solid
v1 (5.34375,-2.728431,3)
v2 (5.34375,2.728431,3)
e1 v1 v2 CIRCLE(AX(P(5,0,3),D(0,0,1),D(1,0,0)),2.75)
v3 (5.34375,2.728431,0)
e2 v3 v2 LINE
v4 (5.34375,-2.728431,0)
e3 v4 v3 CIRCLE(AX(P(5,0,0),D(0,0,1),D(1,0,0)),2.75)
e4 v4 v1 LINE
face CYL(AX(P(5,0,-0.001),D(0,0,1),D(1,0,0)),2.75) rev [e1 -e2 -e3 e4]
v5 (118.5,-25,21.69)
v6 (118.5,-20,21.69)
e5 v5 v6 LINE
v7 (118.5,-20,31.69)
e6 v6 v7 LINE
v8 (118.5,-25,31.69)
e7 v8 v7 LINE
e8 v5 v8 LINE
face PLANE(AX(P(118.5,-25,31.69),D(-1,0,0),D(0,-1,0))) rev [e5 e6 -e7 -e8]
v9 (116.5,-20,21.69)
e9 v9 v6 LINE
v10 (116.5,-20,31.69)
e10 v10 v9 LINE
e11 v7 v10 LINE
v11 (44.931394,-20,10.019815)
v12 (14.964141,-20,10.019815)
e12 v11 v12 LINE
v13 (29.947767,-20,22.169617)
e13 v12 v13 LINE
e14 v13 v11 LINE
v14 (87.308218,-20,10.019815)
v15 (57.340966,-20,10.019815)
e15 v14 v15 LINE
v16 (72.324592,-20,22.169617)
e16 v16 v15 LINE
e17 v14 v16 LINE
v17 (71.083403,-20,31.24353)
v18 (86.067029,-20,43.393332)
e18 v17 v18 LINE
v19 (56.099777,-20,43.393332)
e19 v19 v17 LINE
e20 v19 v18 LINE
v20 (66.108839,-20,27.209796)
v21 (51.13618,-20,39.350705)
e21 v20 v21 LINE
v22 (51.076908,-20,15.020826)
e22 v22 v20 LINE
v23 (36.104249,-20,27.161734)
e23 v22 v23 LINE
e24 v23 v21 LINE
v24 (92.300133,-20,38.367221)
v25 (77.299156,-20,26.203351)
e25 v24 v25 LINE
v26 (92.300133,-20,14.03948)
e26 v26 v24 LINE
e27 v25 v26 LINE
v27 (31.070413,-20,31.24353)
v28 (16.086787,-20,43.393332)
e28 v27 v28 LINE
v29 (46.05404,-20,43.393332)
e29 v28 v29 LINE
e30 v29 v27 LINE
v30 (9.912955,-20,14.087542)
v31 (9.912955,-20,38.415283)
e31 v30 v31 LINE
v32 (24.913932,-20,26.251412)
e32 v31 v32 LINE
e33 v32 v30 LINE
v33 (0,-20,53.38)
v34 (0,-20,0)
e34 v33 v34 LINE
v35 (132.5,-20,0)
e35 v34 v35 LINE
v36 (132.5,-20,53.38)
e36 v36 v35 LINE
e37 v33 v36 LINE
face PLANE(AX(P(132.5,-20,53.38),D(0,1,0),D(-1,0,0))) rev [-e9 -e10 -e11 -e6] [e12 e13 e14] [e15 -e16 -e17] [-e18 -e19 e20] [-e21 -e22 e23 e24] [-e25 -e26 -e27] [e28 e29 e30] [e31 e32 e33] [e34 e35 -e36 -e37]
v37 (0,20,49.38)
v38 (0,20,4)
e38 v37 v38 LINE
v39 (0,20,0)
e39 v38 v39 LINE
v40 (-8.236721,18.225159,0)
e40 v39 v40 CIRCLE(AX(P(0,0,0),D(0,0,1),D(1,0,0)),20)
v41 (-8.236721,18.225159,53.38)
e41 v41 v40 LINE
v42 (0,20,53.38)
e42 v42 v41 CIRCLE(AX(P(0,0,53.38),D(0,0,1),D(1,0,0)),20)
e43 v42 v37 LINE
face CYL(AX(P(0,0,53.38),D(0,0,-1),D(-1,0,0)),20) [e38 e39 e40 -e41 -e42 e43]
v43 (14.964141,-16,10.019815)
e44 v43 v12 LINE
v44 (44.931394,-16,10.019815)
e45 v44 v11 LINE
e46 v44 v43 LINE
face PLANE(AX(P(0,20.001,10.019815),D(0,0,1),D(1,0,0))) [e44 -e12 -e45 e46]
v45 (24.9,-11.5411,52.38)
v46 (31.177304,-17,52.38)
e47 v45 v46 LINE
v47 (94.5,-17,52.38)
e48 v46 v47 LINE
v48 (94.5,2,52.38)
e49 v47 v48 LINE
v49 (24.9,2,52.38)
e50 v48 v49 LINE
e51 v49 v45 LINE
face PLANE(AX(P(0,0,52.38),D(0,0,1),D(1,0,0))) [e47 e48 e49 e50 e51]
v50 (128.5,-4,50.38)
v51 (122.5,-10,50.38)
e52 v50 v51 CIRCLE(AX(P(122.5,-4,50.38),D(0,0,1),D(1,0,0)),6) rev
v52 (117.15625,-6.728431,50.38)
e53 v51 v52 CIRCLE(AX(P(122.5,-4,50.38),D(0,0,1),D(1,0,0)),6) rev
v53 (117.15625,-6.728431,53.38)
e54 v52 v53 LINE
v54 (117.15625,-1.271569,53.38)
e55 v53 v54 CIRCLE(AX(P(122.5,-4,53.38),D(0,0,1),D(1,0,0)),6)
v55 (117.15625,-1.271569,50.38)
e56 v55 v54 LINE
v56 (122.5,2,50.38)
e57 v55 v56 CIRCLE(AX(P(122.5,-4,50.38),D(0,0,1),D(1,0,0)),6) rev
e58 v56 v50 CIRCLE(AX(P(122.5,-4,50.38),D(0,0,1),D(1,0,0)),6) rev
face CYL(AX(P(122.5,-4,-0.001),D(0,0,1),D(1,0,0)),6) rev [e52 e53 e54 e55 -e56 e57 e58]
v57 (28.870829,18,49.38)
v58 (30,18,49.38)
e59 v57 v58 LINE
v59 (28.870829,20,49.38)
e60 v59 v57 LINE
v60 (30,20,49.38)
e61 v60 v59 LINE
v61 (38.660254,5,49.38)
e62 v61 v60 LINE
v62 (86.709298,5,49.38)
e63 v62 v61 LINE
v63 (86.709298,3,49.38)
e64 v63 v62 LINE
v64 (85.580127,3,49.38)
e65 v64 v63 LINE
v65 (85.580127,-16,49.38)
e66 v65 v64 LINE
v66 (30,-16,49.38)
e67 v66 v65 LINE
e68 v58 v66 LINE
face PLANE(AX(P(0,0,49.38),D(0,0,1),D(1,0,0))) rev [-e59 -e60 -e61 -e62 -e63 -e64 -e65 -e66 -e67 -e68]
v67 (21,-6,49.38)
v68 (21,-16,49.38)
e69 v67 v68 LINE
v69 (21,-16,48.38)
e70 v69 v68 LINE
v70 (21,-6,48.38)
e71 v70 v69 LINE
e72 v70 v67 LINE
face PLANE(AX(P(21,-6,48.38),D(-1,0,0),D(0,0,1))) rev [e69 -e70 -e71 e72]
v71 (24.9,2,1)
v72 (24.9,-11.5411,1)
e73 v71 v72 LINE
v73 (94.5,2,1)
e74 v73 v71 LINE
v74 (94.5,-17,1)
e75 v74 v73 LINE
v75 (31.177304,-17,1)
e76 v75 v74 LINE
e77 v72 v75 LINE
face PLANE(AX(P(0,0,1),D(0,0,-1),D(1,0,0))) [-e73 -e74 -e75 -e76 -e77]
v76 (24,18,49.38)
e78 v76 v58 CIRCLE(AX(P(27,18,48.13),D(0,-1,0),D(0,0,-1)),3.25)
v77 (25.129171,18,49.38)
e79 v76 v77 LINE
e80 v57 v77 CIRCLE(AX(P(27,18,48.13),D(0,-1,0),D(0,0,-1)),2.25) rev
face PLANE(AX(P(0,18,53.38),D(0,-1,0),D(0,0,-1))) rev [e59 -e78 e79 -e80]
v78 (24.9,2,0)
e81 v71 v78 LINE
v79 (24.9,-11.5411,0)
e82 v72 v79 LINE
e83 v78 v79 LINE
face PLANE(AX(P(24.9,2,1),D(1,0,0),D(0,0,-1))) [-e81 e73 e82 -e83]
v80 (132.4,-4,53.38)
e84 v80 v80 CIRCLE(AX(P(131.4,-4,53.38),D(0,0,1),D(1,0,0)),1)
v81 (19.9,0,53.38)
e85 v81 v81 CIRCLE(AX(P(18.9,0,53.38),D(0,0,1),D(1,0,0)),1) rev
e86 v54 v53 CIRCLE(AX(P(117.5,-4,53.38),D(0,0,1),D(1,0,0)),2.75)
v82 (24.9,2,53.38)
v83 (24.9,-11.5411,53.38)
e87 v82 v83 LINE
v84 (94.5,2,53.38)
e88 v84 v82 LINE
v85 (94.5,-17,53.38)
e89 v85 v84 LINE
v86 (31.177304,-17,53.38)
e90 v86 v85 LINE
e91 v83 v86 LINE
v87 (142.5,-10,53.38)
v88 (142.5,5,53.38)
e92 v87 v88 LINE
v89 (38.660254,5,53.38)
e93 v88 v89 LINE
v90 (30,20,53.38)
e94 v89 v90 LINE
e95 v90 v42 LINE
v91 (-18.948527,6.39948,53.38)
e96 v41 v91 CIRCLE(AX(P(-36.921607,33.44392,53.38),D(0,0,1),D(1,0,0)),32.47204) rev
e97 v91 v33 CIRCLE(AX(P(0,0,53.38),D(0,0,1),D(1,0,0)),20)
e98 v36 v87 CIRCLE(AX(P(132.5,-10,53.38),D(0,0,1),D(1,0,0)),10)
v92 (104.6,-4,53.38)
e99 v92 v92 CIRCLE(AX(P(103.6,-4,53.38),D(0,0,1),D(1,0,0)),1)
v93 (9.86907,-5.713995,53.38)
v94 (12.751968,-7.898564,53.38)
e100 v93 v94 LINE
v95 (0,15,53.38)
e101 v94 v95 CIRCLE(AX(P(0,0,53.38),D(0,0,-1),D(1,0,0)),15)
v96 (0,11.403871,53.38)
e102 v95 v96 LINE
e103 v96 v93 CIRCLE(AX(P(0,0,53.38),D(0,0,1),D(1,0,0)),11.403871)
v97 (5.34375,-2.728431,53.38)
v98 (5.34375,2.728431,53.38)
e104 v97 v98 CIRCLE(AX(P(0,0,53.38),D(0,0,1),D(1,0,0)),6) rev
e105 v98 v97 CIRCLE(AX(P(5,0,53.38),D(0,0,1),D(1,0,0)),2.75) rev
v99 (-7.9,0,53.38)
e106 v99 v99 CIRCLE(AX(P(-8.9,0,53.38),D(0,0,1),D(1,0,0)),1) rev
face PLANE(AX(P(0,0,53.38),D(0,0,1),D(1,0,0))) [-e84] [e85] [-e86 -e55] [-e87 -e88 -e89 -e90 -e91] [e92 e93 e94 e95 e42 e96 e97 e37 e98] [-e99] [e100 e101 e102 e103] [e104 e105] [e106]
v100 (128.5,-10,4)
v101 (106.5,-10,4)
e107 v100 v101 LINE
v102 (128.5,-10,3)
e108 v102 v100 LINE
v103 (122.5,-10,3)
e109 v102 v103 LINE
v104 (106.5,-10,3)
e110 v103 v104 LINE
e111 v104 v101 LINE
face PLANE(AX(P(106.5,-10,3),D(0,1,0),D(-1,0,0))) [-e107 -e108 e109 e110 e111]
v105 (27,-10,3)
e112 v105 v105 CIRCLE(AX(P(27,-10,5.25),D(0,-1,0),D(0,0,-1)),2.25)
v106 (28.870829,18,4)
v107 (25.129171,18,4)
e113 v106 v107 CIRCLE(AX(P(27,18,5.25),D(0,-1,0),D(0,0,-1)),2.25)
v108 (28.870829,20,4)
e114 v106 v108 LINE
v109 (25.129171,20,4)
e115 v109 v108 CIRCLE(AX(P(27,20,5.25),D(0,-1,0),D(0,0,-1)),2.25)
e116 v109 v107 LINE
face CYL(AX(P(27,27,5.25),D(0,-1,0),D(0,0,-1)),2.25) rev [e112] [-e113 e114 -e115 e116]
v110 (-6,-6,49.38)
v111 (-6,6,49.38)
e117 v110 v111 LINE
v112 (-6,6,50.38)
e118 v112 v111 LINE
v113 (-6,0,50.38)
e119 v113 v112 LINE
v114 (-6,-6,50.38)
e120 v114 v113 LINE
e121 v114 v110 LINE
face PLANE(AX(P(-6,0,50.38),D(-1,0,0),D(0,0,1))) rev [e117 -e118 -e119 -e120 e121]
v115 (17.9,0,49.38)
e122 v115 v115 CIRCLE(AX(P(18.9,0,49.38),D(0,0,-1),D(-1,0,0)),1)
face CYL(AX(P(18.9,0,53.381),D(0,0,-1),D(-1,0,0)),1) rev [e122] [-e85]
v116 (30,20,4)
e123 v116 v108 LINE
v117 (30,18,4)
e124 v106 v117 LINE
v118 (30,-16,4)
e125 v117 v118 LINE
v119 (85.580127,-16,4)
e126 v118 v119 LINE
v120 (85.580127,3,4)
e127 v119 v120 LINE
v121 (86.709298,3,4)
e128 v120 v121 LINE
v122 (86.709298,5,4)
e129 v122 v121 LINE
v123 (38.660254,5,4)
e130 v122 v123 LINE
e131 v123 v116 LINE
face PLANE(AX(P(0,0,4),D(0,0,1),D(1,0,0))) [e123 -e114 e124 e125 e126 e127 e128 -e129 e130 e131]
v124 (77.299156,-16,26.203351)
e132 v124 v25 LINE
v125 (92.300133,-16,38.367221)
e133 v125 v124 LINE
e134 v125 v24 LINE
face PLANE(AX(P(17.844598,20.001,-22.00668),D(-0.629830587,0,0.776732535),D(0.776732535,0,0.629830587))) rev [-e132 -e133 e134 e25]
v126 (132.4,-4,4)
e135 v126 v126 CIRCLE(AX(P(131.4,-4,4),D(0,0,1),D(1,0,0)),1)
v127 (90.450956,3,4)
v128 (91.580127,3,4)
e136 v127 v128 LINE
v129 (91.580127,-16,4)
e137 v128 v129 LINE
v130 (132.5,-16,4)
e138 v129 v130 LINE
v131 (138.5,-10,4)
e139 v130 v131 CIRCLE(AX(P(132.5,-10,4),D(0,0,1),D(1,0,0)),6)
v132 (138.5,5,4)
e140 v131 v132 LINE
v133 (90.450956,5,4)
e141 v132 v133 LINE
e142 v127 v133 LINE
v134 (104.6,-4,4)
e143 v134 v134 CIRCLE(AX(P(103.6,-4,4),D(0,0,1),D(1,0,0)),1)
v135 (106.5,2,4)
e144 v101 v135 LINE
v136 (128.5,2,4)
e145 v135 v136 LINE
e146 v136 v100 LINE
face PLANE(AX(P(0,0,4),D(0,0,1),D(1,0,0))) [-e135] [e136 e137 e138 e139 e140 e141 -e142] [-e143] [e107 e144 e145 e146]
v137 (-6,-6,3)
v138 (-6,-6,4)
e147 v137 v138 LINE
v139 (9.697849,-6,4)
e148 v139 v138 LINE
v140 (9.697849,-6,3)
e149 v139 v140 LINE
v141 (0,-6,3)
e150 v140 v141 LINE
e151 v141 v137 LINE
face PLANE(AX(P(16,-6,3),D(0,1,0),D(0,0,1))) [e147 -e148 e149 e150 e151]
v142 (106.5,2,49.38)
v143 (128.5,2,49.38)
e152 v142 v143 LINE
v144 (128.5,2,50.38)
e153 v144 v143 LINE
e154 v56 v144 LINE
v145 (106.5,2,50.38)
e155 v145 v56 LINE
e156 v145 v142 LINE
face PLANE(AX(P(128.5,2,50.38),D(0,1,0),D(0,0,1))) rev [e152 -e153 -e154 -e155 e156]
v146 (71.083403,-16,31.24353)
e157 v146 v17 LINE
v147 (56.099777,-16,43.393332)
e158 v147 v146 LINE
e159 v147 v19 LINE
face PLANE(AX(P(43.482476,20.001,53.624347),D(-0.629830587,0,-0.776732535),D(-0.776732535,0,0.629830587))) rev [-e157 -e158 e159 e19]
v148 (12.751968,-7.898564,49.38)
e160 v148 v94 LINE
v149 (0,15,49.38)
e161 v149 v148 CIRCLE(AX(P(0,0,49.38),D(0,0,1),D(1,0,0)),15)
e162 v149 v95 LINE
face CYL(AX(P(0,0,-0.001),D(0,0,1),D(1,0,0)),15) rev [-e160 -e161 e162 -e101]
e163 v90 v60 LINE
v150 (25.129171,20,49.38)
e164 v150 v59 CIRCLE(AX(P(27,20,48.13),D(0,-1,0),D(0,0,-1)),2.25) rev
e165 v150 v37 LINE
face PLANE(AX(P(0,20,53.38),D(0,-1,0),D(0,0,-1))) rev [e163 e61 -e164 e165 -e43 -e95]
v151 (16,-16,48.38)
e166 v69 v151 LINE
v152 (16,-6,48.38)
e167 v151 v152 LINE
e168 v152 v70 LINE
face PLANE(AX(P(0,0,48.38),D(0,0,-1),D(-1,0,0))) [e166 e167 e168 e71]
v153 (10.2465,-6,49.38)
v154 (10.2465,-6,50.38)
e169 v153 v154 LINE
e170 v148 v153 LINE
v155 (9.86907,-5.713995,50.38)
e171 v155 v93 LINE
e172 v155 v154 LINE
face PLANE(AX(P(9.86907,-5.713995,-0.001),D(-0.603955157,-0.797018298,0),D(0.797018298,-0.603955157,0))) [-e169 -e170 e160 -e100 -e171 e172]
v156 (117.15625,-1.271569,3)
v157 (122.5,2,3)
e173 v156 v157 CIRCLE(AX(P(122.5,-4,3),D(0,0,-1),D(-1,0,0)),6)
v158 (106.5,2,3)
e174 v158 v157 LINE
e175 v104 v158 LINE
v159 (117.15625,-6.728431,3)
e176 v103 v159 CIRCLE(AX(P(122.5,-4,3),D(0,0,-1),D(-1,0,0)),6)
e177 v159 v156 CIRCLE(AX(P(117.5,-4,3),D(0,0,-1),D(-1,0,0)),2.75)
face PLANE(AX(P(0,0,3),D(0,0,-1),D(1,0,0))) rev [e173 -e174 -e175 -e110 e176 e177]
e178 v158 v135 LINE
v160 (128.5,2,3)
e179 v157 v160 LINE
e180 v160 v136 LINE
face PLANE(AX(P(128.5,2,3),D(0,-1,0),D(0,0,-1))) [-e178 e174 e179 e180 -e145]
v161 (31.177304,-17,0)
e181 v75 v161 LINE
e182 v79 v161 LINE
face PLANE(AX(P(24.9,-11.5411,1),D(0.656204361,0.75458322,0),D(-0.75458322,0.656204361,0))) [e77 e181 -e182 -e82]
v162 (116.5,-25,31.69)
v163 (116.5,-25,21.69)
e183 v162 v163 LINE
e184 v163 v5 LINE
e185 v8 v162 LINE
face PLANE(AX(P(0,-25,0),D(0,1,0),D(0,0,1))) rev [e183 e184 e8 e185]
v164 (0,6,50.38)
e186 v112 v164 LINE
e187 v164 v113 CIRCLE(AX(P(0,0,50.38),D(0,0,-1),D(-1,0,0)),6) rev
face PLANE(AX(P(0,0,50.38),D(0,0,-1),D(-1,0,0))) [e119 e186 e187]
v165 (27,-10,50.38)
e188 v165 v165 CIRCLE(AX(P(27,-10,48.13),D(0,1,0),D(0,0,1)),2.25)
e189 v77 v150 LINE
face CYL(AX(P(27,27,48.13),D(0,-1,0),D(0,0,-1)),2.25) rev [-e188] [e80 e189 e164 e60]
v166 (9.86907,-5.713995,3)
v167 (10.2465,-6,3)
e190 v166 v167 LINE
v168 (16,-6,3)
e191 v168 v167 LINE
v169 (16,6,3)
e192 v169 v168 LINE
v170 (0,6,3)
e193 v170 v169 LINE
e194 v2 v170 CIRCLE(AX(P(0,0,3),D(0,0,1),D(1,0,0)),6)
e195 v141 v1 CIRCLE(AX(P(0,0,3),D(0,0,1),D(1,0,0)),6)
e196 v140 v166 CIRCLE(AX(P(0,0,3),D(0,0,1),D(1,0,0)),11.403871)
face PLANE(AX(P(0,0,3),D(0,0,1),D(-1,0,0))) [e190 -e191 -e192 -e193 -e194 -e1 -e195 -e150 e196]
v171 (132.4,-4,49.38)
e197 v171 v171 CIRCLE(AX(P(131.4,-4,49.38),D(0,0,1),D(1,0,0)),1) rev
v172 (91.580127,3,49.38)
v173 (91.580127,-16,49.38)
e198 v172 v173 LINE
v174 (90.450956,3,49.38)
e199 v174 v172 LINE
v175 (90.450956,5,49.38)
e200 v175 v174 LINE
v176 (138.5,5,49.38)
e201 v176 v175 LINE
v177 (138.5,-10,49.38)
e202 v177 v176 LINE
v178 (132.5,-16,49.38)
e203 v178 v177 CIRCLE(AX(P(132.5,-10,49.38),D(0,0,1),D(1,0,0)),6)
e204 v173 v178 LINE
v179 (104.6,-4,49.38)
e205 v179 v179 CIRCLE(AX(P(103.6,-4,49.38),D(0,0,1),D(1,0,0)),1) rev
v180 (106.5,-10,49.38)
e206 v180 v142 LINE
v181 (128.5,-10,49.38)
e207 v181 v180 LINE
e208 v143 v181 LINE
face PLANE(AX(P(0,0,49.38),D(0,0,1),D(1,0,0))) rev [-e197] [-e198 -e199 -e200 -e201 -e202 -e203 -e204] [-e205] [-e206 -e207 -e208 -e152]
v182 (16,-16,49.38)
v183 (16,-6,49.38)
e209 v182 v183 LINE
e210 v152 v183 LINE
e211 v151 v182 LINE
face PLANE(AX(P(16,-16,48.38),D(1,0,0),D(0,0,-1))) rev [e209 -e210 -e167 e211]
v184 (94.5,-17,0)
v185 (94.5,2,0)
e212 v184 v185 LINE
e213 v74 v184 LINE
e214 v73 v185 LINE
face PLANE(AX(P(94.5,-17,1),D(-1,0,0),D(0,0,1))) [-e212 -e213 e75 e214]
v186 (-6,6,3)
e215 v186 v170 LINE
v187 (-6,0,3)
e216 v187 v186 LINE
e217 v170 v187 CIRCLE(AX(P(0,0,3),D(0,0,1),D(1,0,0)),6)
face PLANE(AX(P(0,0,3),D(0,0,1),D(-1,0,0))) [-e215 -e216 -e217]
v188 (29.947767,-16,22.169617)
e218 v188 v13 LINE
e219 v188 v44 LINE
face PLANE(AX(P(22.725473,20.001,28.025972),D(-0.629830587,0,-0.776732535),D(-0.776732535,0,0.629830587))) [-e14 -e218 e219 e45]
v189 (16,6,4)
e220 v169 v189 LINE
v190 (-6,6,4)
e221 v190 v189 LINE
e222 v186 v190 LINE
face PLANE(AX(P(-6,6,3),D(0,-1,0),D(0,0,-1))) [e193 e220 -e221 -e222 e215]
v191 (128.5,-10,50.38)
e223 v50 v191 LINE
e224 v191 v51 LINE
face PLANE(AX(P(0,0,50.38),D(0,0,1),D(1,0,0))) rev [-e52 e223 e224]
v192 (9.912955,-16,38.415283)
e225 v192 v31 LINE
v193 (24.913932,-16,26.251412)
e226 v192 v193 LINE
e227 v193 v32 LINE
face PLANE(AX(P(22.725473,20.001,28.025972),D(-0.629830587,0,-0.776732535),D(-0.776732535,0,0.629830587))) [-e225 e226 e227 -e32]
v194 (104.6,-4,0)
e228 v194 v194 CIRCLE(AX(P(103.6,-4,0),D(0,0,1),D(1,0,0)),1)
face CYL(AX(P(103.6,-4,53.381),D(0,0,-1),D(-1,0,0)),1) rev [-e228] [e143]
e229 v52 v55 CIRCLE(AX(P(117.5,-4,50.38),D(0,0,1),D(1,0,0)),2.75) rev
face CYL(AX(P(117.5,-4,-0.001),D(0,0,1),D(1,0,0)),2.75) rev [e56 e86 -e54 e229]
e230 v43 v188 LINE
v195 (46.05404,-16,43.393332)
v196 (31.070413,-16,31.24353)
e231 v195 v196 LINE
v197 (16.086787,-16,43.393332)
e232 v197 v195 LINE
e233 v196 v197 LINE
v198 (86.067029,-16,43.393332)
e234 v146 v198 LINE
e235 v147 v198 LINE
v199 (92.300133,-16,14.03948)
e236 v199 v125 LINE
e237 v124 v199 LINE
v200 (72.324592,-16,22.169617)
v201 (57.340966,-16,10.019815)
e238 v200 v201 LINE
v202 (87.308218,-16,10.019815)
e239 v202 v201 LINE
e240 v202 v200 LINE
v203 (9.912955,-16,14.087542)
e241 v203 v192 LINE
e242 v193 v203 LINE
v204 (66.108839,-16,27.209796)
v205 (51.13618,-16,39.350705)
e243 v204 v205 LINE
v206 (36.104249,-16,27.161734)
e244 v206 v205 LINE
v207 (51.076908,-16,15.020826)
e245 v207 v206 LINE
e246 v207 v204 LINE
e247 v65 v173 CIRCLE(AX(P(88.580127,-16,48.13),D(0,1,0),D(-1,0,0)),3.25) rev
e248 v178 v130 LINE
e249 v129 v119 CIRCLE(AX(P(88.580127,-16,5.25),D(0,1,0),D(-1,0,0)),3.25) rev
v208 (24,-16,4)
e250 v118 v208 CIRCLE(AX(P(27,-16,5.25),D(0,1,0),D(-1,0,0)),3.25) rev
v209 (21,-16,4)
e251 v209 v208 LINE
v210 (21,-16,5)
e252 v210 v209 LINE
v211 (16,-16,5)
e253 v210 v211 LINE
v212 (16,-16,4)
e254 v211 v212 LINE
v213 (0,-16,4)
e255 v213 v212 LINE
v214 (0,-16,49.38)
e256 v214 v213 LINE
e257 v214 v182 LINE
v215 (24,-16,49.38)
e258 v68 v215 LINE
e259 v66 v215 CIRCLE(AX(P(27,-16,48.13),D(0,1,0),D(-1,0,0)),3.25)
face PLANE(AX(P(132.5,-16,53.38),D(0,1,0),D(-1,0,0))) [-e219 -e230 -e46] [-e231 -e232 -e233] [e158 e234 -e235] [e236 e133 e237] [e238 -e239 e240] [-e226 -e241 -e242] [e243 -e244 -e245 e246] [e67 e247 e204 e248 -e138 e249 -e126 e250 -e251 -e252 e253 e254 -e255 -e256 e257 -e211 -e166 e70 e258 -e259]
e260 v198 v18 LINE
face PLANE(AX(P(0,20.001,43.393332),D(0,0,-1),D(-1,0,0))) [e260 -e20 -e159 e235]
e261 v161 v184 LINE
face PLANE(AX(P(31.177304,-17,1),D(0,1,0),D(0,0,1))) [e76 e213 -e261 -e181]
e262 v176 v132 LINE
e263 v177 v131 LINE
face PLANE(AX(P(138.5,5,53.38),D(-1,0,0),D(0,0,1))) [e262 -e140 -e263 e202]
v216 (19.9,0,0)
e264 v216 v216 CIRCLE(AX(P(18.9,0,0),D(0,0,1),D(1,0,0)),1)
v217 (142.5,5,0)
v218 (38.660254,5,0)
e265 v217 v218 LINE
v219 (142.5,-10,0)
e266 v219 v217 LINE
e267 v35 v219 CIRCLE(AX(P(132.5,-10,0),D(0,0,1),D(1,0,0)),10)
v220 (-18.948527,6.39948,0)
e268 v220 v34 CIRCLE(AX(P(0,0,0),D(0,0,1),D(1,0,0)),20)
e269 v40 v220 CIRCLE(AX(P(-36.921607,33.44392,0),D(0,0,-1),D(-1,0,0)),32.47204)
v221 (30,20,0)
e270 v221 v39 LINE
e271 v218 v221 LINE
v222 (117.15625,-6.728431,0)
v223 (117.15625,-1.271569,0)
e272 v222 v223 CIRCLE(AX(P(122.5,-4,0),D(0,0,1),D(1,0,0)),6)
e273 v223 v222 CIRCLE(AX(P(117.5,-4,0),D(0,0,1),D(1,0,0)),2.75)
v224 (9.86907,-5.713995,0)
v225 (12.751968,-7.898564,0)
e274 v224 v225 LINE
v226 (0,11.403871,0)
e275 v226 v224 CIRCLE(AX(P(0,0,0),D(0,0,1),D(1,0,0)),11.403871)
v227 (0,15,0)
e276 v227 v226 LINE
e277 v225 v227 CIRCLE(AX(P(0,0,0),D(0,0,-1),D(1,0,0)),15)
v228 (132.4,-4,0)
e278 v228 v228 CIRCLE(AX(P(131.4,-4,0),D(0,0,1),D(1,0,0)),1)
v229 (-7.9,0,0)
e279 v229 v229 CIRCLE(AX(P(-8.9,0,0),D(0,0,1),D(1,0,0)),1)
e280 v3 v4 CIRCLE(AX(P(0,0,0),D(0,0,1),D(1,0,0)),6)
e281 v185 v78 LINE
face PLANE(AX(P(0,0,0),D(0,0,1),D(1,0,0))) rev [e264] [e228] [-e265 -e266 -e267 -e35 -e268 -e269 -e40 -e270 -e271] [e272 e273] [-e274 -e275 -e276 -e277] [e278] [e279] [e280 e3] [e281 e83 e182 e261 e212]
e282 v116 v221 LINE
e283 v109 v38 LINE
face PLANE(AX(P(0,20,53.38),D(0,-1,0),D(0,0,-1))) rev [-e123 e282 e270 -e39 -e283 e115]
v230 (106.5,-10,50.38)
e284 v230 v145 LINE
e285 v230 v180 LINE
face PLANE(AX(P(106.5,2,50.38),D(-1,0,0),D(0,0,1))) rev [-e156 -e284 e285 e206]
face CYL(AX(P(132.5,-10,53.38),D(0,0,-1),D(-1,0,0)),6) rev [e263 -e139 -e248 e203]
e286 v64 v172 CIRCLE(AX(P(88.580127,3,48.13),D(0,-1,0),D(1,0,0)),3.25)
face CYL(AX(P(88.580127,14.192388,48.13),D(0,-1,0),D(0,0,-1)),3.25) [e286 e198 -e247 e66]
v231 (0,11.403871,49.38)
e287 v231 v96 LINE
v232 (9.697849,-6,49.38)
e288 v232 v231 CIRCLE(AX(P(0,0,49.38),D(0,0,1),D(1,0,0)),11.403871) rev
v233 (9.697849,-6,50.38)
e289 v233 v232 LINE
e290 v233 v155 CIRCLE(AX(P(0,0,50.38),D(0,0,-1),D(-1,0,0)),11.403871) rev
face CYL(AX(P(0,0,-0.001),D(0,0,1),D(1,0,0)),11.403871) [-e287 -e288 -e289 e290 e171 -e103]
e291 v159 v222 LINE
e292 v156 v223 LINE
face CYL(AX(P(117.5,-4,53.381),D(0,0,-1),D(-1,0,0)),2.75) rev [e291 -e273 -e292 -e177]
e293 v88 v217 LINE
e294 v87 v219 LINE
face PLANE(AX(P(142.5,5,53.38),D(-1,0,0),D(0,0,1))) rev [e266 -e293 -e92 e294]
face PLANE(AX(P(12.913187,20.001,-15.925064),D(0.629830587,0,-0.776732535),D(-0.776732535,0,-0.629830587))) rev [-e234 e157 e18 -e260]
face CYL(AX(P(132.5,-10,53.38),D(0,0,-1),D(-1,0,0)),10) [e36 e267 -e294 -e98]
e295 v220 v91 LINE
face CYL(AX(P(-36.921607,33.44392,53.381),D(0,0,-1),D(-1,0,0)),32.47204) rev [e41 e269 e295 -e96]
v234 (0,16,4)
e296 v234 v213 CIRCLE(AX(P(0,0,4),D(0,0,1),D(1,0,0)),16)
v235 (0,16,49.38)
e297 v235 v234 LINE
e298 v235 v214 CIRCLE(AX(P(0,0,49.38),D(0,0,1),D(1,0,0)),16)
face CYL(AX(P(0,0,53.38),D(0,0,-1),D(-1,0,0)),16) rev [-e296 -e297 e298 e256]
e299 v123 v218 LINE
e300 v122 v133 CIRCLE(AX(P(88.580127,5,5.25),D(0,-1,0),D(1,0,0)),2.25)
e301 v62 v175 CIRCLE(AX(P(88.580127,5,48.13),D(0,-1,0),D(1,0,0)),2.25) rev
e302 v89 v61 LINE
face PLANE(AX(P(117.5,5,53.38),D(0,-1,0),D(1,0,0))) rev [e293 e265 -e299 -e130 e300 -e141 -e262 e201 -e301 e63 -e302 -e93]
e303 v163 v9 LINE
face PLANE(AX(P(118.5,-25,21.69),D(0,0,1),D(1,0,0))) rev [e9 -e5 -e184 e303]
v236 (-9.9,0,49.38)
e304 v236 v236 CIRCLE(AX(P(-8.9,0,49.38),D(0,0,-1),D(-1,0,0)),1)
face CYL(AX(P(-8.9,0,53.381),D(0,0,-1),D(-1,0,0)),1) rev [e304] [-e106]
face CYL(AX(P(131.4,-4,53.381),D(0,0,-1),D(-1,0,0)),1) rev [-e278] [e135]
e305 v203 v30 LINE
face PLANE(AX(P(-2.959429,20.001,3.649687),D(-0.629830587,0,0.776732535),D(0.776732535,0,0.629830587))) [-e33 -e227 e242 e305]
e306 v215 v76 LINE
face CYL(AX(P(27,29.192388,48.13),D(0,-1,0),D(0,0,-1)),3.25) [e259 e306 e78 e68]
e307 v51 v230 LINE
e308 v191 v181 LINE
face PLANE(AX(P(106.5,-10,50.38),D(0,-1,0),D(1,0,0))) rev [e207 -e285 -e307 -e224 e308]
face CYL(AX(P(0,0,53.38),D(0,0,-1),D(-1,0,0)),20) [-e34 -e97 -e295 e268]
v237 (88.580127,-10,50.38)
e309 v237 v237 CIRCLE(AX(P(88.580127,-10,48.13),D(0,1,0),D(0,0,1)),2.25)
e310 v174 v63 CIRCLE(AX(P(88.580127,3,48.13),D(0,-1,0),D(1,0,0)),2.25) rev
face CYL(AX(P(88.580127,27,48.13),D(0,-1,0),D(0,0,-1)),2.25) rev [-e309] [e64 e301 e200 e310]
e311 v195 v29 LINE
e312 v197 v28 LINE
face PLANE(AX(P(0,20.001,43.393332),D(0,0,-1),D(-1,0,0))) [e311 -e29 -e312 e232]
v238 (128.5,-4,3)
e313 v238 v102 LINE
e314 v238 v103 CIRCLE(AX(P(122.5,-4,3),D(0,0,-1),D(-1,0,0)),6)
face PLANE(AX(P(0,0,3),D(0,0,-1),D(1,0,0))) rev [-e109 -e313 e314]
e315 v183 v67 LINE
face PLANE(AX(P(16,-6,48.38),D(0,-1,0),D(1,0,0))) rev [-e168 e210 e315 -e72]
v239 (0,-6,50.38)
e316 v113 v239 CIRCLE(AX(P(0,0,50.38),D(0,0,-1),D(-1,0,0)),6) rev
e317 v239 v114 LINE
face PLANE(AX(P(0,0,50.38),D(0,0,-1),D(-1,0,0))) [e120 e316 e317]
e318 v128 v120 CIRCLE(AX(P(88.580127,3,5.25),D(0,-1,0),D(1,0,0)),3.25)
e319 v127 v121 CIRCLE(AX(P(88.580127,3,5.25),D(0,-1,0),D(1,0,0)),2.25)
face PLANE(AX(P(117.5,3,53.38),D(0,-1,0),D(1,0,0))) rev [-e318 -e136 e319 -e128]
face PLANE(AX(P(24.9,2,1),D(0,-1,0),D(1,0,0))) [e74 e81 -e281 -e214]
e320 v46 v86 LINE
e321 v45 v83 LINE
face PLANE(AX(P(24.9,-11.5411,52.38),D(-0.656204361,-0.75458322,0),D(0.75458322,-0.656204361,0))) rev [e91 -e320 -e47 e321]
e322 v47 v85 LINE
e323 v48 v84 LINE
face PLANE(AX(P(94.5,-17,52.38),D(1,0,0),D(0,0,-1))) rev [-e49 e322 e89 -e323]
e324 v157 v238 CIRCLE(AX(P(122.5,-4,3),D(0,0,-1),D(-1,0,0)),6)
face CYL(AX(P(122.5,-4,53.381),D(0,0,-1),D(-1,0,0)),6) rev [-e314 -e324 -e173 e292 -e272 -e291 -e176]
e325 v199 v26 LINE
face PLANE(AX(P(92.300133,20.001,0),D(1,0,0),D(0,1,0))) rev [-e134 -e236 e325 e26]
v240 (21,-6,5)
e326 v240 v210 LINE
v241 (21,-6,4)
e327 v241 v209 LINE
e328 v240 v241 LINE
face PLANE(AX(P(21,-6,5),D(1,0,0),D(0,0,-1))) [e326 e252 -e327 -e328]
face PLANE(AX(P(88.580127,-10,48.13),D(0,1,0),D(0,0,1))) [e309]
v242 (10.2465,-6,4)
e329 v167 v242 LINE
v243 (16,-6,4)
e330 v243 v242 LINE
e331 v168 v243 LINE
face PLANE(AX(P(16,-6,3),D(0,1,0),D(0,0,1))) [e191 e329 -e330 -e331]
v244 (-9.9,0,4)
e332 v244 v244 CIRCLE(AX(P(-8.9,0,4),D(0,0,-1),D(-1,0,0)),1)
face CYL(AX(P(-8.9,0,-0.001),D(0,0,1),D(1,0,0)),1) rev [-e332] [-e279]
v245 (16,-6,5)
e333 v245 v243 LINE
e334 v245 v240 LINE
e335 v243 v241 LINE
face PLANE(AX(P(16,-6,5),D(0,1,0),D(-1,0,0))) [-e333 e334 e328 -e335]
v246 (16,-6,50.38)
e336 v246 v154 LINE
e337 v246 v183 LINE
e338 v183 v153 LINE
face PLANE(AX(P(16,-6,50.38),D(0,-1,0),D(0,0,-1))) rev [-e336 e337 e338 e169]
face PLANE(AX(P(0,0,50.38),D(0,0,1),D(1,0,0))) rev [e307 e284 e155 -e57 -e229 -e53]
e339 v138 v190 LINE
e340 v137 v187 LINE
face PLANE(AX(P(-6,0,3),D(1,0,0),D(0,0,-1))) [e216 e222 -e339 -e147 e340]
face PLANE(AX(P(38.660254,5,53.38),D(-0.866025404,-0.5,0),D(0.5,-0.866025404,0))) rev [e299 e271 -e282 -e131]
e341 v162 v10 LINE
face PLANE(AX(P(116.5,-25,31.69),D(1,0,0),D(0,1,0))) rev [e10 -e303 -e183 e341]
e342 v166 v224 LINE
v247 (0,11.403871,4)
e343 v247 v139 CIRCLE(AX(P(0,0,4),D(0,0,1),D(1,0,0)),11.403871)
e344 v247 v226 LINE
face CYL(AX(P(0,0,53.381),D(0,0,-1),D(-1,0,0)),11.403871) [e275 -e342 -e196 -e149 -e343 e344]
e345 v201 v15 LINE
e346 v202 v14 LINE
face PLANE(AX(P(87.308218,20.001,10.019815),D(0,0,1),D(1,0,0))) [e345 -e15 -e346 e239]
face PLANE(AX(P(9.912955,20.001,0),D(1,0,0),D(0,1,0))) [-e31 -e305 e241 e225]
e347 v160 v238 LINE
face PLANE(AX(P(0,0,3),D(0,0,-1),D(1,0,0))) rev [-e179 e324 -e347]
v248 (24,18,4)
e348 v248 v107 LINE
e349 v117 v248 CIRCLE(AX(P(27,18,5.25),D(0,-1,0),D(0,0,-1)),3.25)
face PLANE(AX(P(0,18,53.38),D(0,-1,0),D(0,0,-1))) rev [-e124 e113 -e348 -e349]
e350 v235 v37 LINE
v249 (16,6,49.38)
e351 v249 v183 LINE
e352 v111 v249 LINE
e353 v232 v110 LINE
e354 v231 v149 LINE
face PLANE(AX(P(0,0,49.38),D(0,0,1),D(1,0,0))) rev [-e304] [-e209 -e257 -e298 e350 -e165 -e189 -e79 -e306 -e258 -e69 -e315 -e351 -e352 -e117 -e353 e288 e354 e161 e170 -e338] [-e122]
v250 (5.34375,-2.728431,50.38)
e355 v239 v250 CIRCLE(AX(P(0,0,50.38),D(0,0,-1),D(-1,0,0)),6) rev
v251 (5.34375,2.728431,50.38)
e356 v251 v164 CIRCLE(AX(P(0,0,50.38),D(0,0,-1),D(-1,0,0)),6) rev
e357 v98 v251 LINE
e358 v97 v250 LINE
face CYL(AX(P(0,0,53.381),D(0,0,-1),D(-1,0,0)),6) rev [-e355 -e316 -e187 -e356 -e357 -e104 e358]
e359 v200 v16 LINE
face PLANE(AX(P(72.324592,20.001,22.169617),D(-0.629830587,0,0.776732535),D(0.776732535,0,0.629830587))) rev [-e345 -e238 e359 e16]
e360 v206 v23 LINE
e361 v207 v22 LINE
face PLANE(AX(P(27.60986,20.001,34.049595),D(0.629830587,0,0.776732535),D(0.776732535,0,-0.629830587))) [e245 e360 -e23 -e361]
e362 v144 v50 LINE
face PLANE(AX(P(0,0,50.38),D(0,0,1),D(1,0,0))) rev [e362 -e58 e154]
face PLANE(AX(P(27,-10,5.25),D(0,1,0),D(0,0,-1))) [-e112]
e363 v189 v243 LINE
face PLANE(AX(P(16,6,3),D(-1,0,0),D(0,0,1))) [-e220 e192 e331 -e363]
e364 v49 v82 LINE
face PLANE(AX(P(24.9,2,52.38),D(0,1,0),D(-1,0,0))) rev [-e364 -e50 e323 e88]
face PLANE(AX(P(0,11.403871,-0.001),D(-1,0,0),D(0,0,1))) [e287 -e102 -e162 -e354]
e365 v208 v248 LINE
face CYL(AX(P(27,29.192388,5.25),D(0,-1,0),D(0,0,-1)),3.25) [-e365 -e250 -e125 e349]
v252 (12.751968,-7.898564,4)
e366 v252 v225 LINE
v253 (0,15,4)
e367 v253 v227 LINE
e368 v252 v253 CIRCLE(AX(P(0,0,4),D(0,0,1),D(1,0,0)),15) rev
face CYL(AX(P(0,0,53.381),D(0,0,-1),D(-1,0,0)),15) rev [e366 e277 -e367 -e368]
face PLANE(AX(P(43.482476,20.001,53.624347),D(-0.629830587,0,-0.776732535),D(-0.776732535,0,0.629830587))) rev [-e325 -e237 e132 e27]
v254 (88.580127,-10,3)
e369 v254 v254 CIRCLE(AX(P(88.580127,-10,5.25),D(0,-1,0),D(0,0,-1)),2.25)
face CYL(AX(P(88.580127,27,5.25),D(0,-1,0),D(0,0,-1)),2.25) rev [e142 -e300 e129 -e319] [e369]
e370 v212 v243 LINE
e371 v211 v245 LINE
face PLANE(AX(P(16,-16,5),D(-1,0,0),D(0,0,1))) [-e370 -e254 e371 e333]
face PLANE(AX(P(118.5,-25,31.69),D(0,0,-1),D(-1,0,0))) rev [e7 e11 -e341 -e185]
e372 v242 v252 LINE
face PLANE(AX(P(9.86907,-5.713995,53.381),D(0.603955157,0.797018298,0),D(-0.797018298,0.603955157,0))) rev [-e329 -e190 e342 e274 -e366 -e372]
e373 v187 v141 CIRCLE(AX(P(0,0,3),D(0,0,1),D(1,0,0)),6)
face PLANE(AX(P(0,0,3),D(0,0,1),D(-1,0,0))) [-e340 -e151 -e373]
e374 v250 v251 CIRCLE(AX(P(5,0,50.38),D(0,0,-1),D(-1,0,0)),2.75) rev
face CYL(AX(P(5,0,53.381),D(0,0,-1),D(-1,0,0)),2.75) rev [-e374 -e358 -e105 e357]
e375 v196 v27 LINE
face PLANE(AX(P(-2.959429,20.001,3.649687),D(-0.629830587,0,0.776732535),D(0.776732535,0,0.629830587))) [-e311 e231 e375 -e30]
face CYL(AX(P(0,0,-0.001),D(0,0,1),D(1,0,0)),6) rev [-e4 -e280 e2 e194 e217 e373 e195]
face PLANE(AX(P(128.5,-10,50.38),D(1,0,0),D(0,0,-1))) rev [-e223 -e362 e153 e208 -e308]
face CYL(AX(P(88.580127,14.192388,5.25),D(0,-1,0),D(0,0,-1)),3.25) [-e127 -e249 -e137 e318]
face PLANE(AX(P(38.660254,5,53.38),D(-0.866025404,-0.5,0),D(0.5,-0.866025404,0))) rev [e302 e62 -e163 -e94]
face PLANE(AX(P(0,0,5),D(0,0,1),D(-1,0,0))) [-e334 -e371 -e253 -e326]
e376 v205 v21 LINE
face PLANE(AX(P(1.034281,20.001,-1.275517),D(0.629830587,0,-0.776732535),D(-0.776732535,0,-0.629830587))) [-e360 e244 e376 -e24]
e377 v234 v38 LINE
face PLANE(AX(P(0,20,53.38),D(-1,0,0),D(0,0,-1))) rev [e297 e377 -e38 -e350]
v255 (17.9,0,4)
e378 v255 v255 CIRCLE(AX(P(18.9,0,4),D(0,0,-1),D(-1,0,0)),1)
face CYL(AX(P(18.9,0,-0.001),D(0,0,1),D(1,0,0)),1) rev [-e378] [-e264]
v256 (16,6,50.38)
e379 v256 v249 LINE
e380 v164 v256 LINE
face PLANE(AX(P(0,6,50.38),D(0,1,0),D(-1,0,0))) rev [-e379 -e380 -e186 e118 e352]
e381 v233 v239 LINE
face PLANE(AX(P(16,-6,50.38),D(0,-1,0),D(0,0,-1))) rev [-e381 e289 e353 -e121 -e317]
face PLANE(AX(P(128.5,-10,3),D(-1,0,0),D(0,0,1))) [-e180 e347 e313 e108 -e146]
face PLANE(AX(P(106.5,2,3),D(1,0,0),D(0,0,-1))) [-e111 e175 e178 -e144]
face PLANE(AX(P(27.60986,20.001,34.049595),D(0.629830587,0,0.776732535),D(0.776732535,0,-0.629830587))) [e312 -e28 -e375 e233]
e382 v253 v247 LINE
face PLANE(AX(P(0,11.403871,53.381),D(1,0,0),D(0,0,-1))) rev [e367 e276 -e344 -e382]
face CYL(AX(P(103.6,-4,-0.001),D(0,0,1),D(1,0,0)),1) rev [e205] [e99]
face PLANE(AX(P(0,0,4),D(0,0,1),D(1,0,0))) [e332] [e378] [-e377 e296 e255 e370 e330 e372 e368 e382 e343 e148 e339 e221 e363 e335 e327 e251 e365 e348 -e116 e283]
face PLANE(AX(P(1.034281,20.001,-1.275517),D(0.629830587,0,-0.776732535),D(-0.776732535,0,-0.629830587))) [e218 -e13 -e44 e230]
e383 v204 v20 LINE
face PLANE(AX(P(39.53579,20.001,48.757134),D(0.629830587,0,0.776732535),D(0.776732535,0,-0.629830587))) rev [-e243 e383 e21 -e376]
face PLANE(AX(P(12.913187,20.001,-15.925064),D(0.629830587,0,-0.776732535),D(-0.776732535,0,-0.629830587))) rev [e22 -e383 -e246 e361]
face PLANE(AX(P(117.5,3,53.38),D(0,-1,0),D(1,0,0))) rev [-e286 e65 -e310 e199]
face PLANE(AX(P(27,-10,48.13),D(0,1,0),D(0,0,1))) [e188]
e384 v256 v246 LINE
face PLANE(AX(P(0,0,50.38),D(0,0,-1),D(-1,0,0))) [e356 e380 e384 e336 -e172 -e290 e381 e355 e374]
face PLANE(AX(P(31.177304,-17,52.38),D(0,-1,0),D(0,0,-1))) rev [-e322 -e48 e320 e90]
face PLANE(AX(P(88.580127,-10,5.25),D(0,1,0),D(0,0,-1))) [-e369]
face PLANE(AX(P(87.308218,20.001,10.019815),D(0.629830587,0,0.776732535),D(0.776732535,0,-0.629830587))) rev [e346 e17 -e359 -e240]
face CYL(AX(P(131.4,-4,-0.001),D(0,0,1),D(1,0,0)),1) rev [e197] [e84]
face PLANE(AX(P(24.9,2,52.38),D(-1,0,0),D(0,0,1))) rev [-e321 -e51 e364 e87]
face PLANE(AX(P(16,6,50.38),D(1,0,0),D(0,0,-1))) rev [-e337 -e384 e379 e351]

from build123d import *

# Parameters (mm, degrees)
BOSS_EXTRUDE1_DEPTH = 53.38
SHELL4_START        = 4
SHELL4_DEPTH        = 45.38
CUT_EXTRUDE2_REACH  = 154.134
CUT_EXTRUDE3_DEPTH  = 1
CUT_EXTRUDE4_REACH  = 154.134
SKETCH4_R           = 1
BOSS_EXTRUDE3_START = -36
SKETCH8_3_R         = 3.25
BOSS_EXTRUDE3_DEPTH = 34
BOSS_EXTRUDE2_START = -36
SKETCH8_R           = 3.25
BOSS_EXTRUDE2_DEPTH = 19
CUT_EXTRUDE6_DEPTH  = 1
SKETCH15_W          = 5
SKETCH15_H          = 10
BOSS_EXTRUDE6_DEPTH = 1
CUT_EXTRUDE5_REACH  = 155.479
CUT_EXTRUDE8_START  = -30
SKETCH11_R          = 2.25
CUT_EXTRUDE8_DEPTH  = 37
CUT_EXTRUDE10_REACH = 159.339
SKETCH33_W          = 22
SKETCH33_H          = 12
CUT_EXTRUDE12_DEPTH = 1
CUT_EXTRUDE11_REACH = 155.479
SKETCH31_R          = 6
SKETCH31_R_2        = 2.75
SKETCH31_R_3        = 1
SKETCH30_W          = 2
SKETCH30_H          = 10
BOSS_EXTRUDE7_DEPTH = 5
CUT_EXTRUDE13_REACH = 156.21


# Read off the part's stored shape, not the designer's step: Shell4
with BuildPart() as part:
    # Sketch1 → Boss-Extrude1 (new body)
    with BuildSketch(Plane.XY):
        with BuildLine():
            Line((0, 20), (30, 20))
            Line((30, 20), (38.660254038, 5))
            Line((38.660254038, 5), (117.5, 5))
            Line((117.5, 5), (142.5, 5))
            Line((142.5, 5), (142.5, -10))
            ThreePointArc((142.5, -10), (139.571067812, -17.071067812), (132.5, -20))
            Line((132.5, -20), (117.5, -20))
            Line((117.5, -20), (0, -20))
            ThreePointArc((0, -20), (-20, 0), (0, 20))
        make_face()
    extrude(amount=BOSS_EXTRUDE1_DEPTH)

    # Shell4 outline → Shell4 (cut)
    with BuildSketch(Plane.XY.offset(SHELL4_START)):
        with BuildLine():
            Line((30, 20), (0, 20))
            Line((0, 20), (0, 16))
            ThreePointArc((0, 16), (-16, 0), (0, -16))
            Line((0, -16), (132.5, -16))
            ThreePointArc((132.5, -16), (136.742640687, -14.242640687), (138.5, -10))
            Line((138.5, -10), (138.5, 5))
            Line((138.5, 5), (38.660254038, 5))
            Line((38.660254038, 5), (30, 20))
        make_face()
    extrude(amount=SHELL4_DEPTH, mode=Mode.SUBTRACT)

    # Sketch2 → Cut-Extrude2 (cut, up to next)
    with BuildSketch(Plane(origin=(0, 0, 49.38), x_dir=(-1, 0, 0), z_dir=(0, 0, -1)), mode=Mode.PRIVATE) as cut_extrude2_sk1:
        with BuildLine():
            ThreePointArc((-5.34375, -2.72843104), (6, 0), (-5.34375, 2.72843104))
            ThreePointArc((-5.34375, 2.72843104), (-7.75, 0), (-5.34375, -2.72843104))
        make_face()
    cut_extrude2_tool1 = extrude(cut_extrude2_sk1.sketch, amount=-CUT_EXTRUDE2_REACH, mode=Mode.PRIVATE) & part.part
    cut_extrude2 = cut_extrude2_tool1.solids().sort_by_distance((0.414061, 0, 49.38))[0]
    add(cut_extrude2, mode=Mode.SUBTRACT)

    # Sketch3 → Cut-Extrude3 (cut)
    with BuildSketch(Plane(origin=(0, 0, 49.38), x_dir=(-1, 0, 0), z_dir=(0, 0, -1))):
        Polygon((6, 0), (6, 6), (0, 6), (-16, 6), (-16, -6), (6, -6), align=None)
    cut_extrude3 = extrude(amount=-CUT_EXTRUDE3_DEPTH, mode=Mode.SUBTRACT)

    # Sketch4 → Cut-Extrude4 (cut, up to next)
    with BuildSketch(Plane(origin=(0, 0, 49.38), x_dir=(-1, 0, 0), z_dir=(0, 0, -1)), mode=Mode.PRIVATE) as cut_extrude4_sk1:
        with Locations((-18.9, 0)):
            Circle(SKETCH4_R)
    cut_extrude4_tool1 = extrude(cut_extrude4_sk1.sketch, amount=-CUT_EXTRUDE4_REACH, mode=Mode.PRIVATE) & part.part
    # Sketch4 → Cut-Extrude4 (cut, up to next)
    with BuildSketch(Plane(origin=(0, 0, 49.38), x_dir=(-1, 0, 0), z_dir=(0, 0, -1)), mode=Mode.PRIVATE) as cut_extrude4_sk2:
        with Locations((8.9, 0)):
            Circle(SKETCH4_R)
    cut_extrude4_tool2 = extrude(cut_extrude4_sk2.sketch, amount=-CUT_EXTRUDE4_REACH, mode=Mode.PRIVATE) & part.part
    cut_extrude4_1 = cut_extrude4_tool1.solids().sort_by_distance((18.9, 0, 49.38))[0]
    add(cut_extrude4_1, mode=Mode.SUBTRACT)
    cut_extrude4_2 = cut_extrude4_tool2.solids().sort_by_distance((-8.9, 0, 49.38))[0]
    add(cut_extrude4_2, mode=Mode.SUBTRACT)
    cut_extrude4 = cut_extrude4_1 + cut_extrude4_2  # Cut-Extrude4 as one shape, for the pattern or mirror that repeats it

    # Sketch8<3> → Boss-Extrude3 (add)
    with BuildSketch(Plane(origin=(0, 20, 0), x_dir=(1, 0, 0), z_dir=(0, 1, 0)).offset(BOSS_EXTRUDE3_START)):
        with Locations((27, -48.13)):
            Circle(SKETCH8_3_R)
    boss_extrude3 = extrude(amount=BOSS_EXTRUDE3_DEPTH)

    # Sketch8 → Boss-Extrude2 (add)
    with BuildSketch(Plane(origin=(0, 20, 0), x_dir=(1, 0, 0), z_dir=(0, 1, 0)).offset(BOSS_EXTRUDE2_START)):
        with Locations((88.580127019, -48.13)):
            Circle(SKETCH8_R)
    boss_extrude2 = extrude(amount=BOSS_EXTRUDE2_DEPTH)

    # Sketch7 → Cut-Extrude6 (cut)
    with BuildSketch(Plane.XY.offset(53.38)):
        Polygon((24.9, 2), (94.5, 2), (94.5, -17), (31.177304436, -17), (24.9, -11.541099722), align=None)
    cut_extrude6 = extrude(amount=-CUT_EXTRUDE6_DEPTH, mode=Mode.SUBTRACT)

    # Sketch15 → Boss-Extrude6 (add)
    with BuildSketch(Plane(origin=(0, 0, 49.38), x_dir=(-1, 0, 0), z_dir=(0, 0, -1))):
        with Locations((-18.5, -11)):
            Rectangle(SKETCH15_W, SKETCH15_H)
    boss_extrude6 = extrude(amount=BOSS_EXTRUDE6_DEPTH)

    # Sketch6 → Cut-Extrude5 (cut, up to next)
    with BuildSketch(Plane(origin=(0, 0, 0), x_dir=(-1, 0, 0), z_dir=(0, 0, -1)), mode=Mode.PRIVATE) as cut_extrude5_sk1:
        with BuildLine():
            Line((-9.869069779, -5.713995107), (-12.75196804, -7.898563864))
            ThreePointArc((-12.75196804, -7.898563864), (13.104931476, -7.29799774), (0, 15))
            Line((0, 15), (0, 11.403871202))
            ThreePointArc((0, 11.403871202), (9.879522828, -5.695902656), (-9.869069779, -5.713995107))
        make_face()
    cut_extrude5_tool1 = extrude(cut_extrude5_sk1.sketch, amount=-CUT_EXTRUDE5_REACH, mode=Mode.PRIVATE) & part.part
    cut_extrude5 = cut_extrude5_tool1.solids().sort_by_distance((-0.408677, 13.201936, 0))[0]
    add(cut_extrude5, mode=Mode.SUBTRACT)

    # Sketch11 → Cut-Extrude8 (cut)
    with BuildSketch(Plane(origin=(0, 20, 0), x_dir=(1, 0, 0), z_dir=(0, 1, 0)).offset(CUT_EXTRUDE8_START)):
        with Locations(Location((27, -48.13, 0), (0, 0, 213.748988596))):
            Circle(SKETCH11_R)
        with Locations(Location((88.580127019, -48.13, 0), (0, 0, 213.748988596))):
            Circle(SKETCH11_R)
    cut_extrude8 = extrude(amount=CUT_EXTRUDE8_DEPTH, mode=Mode.SUBTRACT)

    # Sketch16 → Cut-Extrude10 (cut, up to next)
    with BuildSketch(Plane.XZ.offset(20), mode=Mode.PRIVATE) as cut_extrude10_sk1:
        Polygon((92.300132803, 14.039480209), (92.300132803, 38.367221242), (77.29915607, 26.203350725), align=None)
    cut_extrude10_tool1 = extrude(cut_extrude10_sk1.sketch, amount=-CUT_EXTRUDE10_REACH, mode=Mode.PRIVATE) & part.part
    # Sketch16 → Cut-Extrude10 (cut, up to next)
    with BuildSketch(Plane.XZ.offset(20), mode=Mode.PRIVATE) as cut_extrude10_sk2:
        Polygon((56.099776869, 43.393331633), (86.067029292, 43.393331633), (71.08340308, 31.243530166), align=None)
    cut_extrude10_tool2 = extrude(cut_extrude10_sk2.sketch, amount=-CUT_EXTRUDE10_REACH, mode=Mode.PRIVATE) & part.part
    # Sketch16 → Cut-Extrude10 (cut, up to next)
    with BuildSketch(Plane.XZ.offset(20), mode=Mode.PRIVATE) as cut_extrude10_sk3:
        Polygon((51.076908189, 15.020825627), (66.108839036, 27.209795964), (51.136179758, 39.350704651), (36.104248911, 27.161734314), align=None)
    cut_extrude10_tool3 = extrude(cut_extrude10_sk3.sketch, amount=-CUT_EXTRUDE10_REACH, mode=Mode.PRIVATE) & part.part
    # Sketch16 → Cut-Extrude10 (cut, up to next)
    with BuildSketch(Plane.XZ.offset(20), mode=Mode.PRIVATE) as cut_extrude10_sk4:
        Polygon((31.070413297, 31.243530166), (16.086787086, 43.393331633), (46.054039509, 43.393331633), align=None)
    cut_extrude10_tool4 = extrude(cut_extrude10_sk4.sketch, amount=-CUT_EXTRUDE10_REACH, mode=Mode.PRIVATE) & part.part
    # Sketch16 → Cut-Extrude10 (cut, up to next)
    with BuildSketch(Plane.XZ.offset(20), mode=Mode.PRIVATE) as cut_extrude10_sk5:
        Polygon((14.96414128, 10.019815057), (29.947767491, 22.169616523), (44.931393703, 10.019815057), align=None)
    cut_extrude10_tool5 = extrude(cut_extrude10_sk5.sketch, amount=-CUT_EXTRUDE10_REACH, mode=Mode.PRIVATE) & part.part
    # Sketch16 → Cut-Extrude10 (cut, up to next)
    with BuildSketch(Plane.XZ.offset(20), mode=Mode.PRIVATE) as cut_extrude10_sk6:
        Polygon((9.912955144, 38.415282892), (24.913931877, 26.251412376), (9.912955144, 14.087541859), align=None)
    cut_extrude10_tool6 = extrude(cut_extrude10_sk6.sketch, amount=-CUT_EXTRUDE10_REACH, mode=Mode.PRIVATE) & part.part
    # Sketch16 → Cut-Extrude10 (cut, up to next)
    with BuildSketch(Plane.XZ.offset(20), mode=Mode.PRIVATE) as cut_extrude10_sk7:
        Polygon((87.308218237, 10.019815057), (72.324592025, 22.169616523), (57.340965814, 10.019815057), align=None)
    cut_extrude10_tool7 = extrude(cut_extrude10_sk7.sketch, amount=-CUT_EXTRUDE10_REACH, mode=Mode.PRIVATE) & part.part
    add(cut_extrude10_tool1.solids().sort_by_distance((87.299807, -20, 26.203351))[0], mode=Mode.SUBTRACT)
    add(cut_extrude10_tool2.solids().sort_by_distance((71.083403, -20, 39.343398))[0], mode=Mode.SUBTRACT)
    add(cut_extrude10_tool3.solids().sort_by_distance((51.106544, -20, 27.185765))[0], mode=Mode.SUBTRACT)
    add(cut_extrude10_tool4.solids().sort_by_distance((31.070413, -20, 39.343398))[0], mode=Mode.SUBTRACT)
    add(cut_extrude10_tool5.solids().sort_by_distance((29.947767, -20, 14.069749))[0], mode=Mode.SUBTRACT)
    add(cut_extrude10_tool6.solids().sort_by_distance((14.913281, -20, 26.251412))[0], mode=Mode.SUBTRACT)
    add(cut_extrude10_tool7.solids().sort_by_distance((72.324592, -20, 14.069749))[0], mode=Mode.SUBTRACT)

    # Sketch33 → Cut-Extrude12 (cut)
    with BuildSketch(Plane(origin=(0, 0, 49.38), x_dir=(-1, 0, 0), z_dir=(0, 0, -1))):
        with Locations((-117.5, -4)):
            Rectangle(SKETCH33_W, SKETCH33_H)
    cut_extrude12 = extrude(amount=-CUT_EXTRUDE12_DEPTH, mode=Mode.SUBTRACT)

    # Sketch31 → Cut-Extrude11 (cut, up to next)
    with BuildSketch(Plane.XY.offset(53.38), mode=Mode.PRIVATE) as cut_extrude11_sk1:
        with Locations((122.5, -4)):
            Circle(SKETCH31_R)
    cut_extrude11_tool1 = extrude(cut_extrude11_sk1.sketch, amount=-CUT_EXTRUDE11_REACH, mode=Mode.PRIVATE) & part.part
    # Sketch31 → Cut-Extrude11 (cut, up to next)
    with BuildSketch(Plane.XY.offset(53.38), mode=Mode.PRIVATE) as cut_extrude11_sk2:
        with Locations((117.5, -4)):
            Circle(SKETCH31_R_2)
    cut_extrude11_tool2 = extrude(cut_extrude11_sk2.sketch, amount=-CUT_EXTRUDE11_REACH, mode=Mode.PRIVATE) & part.part
    # Sketch31 → Cut-Extrude11 (cut, up to next)
    with BuildSketch(Plane.XY.offset(53.38), mode=Mode.PRIVATE) as cut_extrude11_sk3:
        with Locations((103.6, -4)):
            Circle(SKETCH31_R_3)
    cut_extrude11_tool3 = extrude(cut_extrude11_sk3.sketch, amount=-CUT_EXTRUDE11_REACH, mode=Mode.PRIVATE) & part.part
    # Sketch31 → Cut-Extrude11 (cut, up to next)
    with BuildSketch(Plane.XY.offset(53.38), mode=Mode.PRIVATE) as cut_extrude11_sk4:
        with Locations((131.4, -4)):
            Circle(SKETCH31_R_3)
    cut_extrude11_tool4 = extrude(cut_extrude11_sk4.sketch, amount=-CUT_EXTRUDE11_REACH, mode=Mode.PRIVATE) & part.part
    cut_extrude11_1 = cut_extrude11_tool1.solids().sort_by_distance((122.5, -4, 53.38))[0]
    add(cut_extrude11_1, mode=Mode.SUBTRACT)
    cut_extrude11_2 = cut_extrude11_tool2.solids().sort_by_distance((117.5, -4, 53.38))[0]
    add(cut_extrude11_2, mode=Mode.SUBTRACT)
    cut_extrude11_3 = cut_extrude11_tool3.solids().sort_by_distance((103.6, -4, 53.38))[0]
    add(cut_extrude11_3, mode=Mode.SUBTRACT)
    cut_extrude11_4 = cut_extrude11_tool4.solids().sort_by_distance((131.4, -4, 53.38))[0]
    add(cut_extrude11_4, mode=Mode.SUBTRACT)
    cut_extrude11 = cut_extrude11_1 + cut_extrude11_2 + cut_extrude11_3 + cut_extrude11_4  # Cut-Extrude11 as one shape, for the pattern or mirror that repeats it

    # Mirror3: Cut-Extrude2, Cut-Extrude3, Cut-Extrude4, Boss-Extrude3, Boss-Extrude2, Cut-Extrude6, Boss-Extrude6, Cut-Extrude5, Cut-Extrude8, Cut-Extrude12, Cut-Extrude11 across plane
    add(cut_extrude2.mirror(Plane.XY.offset(26.69)), mode=Mode.SUBTRACT)
    add(cut_extrude3.mirror(Plane.XY.offset(26.69)), mode=Mode.SUBTRACT)
    add(cut_extrude4.mirror(Plane.XY.offset(26.69)), mode=Mode.SUBTRACT)
    add(boss_extrude3.mirror(Plane.XY.offset(26.69)))
    add(boss_extrude2.mirror(Plane.XY.offset(26.69)))
    add(cut_extrude6.mirror(Plane.XY.offset(26.69)), mode=Mode.SUBTRACT)
    add(boss_extrude6.mirror(Plane.XY.offset(26.69)))
    add(cut_extrude5.mirror(Plane.XY.offset(26.69)), mode=Mode.SUBTRACT)
    add(cut_extrude8.mirror(Plane.XY.offset(26.69)), mode=Mode.SUBTRACT)
    add(cut_extrude12.mirror(Plane.XY.offset(26.69)), mode=Mode.SUBTRACT)
    add(cut_extrude11.mirror(Plane.XY.offset(26.69)), mode=Mode.SUBTRACT)

    # Sketch30 → Boss-Extrude7 (add)
    with BuildSketch(Plane.XZ.offset(20)):
        with Locations((117.5, 26.69)):
            Rectangle(SKETCH30_W, SKETCH30_H)
    extrude(amount=BOSS_EXTRUDE7_DEPTH)

    # Sketch35 → Cut-Extrude13 (cut, up to next)
    with BuildSketch(Plane(origin=(0, 0, 0), x_dir=(-1, 0, 0), z_dir=(0, 0, -1)), mode=Mode.PRIVATE) as cut_extrude13_sk1:
        with BuildLine():
            Line((8.23672098, 18.22515919), (18.948526501, 18.571081562))
            Line((18.948526501, 18.571081562), (18.948526501, 6.399479936))
            ThreePointArc((18.948526501, 6.399479936), (12.854967599, 11.644144065), (8.23672098, 18.22515919))
        make_face()
    cut_extrude13_tool1 = extrude(cut_extrude13_sk1.sketch, amount=-CUT_EXTRUDE13_REACH, mode=Mode.PRIVATE) & part.part
    add(cut_extrude13_tool1.solids().sort_by_distance((-15.086438, 14.068826, 0))[0], mode=Mode.SUBTRACT)


solid = part.part
